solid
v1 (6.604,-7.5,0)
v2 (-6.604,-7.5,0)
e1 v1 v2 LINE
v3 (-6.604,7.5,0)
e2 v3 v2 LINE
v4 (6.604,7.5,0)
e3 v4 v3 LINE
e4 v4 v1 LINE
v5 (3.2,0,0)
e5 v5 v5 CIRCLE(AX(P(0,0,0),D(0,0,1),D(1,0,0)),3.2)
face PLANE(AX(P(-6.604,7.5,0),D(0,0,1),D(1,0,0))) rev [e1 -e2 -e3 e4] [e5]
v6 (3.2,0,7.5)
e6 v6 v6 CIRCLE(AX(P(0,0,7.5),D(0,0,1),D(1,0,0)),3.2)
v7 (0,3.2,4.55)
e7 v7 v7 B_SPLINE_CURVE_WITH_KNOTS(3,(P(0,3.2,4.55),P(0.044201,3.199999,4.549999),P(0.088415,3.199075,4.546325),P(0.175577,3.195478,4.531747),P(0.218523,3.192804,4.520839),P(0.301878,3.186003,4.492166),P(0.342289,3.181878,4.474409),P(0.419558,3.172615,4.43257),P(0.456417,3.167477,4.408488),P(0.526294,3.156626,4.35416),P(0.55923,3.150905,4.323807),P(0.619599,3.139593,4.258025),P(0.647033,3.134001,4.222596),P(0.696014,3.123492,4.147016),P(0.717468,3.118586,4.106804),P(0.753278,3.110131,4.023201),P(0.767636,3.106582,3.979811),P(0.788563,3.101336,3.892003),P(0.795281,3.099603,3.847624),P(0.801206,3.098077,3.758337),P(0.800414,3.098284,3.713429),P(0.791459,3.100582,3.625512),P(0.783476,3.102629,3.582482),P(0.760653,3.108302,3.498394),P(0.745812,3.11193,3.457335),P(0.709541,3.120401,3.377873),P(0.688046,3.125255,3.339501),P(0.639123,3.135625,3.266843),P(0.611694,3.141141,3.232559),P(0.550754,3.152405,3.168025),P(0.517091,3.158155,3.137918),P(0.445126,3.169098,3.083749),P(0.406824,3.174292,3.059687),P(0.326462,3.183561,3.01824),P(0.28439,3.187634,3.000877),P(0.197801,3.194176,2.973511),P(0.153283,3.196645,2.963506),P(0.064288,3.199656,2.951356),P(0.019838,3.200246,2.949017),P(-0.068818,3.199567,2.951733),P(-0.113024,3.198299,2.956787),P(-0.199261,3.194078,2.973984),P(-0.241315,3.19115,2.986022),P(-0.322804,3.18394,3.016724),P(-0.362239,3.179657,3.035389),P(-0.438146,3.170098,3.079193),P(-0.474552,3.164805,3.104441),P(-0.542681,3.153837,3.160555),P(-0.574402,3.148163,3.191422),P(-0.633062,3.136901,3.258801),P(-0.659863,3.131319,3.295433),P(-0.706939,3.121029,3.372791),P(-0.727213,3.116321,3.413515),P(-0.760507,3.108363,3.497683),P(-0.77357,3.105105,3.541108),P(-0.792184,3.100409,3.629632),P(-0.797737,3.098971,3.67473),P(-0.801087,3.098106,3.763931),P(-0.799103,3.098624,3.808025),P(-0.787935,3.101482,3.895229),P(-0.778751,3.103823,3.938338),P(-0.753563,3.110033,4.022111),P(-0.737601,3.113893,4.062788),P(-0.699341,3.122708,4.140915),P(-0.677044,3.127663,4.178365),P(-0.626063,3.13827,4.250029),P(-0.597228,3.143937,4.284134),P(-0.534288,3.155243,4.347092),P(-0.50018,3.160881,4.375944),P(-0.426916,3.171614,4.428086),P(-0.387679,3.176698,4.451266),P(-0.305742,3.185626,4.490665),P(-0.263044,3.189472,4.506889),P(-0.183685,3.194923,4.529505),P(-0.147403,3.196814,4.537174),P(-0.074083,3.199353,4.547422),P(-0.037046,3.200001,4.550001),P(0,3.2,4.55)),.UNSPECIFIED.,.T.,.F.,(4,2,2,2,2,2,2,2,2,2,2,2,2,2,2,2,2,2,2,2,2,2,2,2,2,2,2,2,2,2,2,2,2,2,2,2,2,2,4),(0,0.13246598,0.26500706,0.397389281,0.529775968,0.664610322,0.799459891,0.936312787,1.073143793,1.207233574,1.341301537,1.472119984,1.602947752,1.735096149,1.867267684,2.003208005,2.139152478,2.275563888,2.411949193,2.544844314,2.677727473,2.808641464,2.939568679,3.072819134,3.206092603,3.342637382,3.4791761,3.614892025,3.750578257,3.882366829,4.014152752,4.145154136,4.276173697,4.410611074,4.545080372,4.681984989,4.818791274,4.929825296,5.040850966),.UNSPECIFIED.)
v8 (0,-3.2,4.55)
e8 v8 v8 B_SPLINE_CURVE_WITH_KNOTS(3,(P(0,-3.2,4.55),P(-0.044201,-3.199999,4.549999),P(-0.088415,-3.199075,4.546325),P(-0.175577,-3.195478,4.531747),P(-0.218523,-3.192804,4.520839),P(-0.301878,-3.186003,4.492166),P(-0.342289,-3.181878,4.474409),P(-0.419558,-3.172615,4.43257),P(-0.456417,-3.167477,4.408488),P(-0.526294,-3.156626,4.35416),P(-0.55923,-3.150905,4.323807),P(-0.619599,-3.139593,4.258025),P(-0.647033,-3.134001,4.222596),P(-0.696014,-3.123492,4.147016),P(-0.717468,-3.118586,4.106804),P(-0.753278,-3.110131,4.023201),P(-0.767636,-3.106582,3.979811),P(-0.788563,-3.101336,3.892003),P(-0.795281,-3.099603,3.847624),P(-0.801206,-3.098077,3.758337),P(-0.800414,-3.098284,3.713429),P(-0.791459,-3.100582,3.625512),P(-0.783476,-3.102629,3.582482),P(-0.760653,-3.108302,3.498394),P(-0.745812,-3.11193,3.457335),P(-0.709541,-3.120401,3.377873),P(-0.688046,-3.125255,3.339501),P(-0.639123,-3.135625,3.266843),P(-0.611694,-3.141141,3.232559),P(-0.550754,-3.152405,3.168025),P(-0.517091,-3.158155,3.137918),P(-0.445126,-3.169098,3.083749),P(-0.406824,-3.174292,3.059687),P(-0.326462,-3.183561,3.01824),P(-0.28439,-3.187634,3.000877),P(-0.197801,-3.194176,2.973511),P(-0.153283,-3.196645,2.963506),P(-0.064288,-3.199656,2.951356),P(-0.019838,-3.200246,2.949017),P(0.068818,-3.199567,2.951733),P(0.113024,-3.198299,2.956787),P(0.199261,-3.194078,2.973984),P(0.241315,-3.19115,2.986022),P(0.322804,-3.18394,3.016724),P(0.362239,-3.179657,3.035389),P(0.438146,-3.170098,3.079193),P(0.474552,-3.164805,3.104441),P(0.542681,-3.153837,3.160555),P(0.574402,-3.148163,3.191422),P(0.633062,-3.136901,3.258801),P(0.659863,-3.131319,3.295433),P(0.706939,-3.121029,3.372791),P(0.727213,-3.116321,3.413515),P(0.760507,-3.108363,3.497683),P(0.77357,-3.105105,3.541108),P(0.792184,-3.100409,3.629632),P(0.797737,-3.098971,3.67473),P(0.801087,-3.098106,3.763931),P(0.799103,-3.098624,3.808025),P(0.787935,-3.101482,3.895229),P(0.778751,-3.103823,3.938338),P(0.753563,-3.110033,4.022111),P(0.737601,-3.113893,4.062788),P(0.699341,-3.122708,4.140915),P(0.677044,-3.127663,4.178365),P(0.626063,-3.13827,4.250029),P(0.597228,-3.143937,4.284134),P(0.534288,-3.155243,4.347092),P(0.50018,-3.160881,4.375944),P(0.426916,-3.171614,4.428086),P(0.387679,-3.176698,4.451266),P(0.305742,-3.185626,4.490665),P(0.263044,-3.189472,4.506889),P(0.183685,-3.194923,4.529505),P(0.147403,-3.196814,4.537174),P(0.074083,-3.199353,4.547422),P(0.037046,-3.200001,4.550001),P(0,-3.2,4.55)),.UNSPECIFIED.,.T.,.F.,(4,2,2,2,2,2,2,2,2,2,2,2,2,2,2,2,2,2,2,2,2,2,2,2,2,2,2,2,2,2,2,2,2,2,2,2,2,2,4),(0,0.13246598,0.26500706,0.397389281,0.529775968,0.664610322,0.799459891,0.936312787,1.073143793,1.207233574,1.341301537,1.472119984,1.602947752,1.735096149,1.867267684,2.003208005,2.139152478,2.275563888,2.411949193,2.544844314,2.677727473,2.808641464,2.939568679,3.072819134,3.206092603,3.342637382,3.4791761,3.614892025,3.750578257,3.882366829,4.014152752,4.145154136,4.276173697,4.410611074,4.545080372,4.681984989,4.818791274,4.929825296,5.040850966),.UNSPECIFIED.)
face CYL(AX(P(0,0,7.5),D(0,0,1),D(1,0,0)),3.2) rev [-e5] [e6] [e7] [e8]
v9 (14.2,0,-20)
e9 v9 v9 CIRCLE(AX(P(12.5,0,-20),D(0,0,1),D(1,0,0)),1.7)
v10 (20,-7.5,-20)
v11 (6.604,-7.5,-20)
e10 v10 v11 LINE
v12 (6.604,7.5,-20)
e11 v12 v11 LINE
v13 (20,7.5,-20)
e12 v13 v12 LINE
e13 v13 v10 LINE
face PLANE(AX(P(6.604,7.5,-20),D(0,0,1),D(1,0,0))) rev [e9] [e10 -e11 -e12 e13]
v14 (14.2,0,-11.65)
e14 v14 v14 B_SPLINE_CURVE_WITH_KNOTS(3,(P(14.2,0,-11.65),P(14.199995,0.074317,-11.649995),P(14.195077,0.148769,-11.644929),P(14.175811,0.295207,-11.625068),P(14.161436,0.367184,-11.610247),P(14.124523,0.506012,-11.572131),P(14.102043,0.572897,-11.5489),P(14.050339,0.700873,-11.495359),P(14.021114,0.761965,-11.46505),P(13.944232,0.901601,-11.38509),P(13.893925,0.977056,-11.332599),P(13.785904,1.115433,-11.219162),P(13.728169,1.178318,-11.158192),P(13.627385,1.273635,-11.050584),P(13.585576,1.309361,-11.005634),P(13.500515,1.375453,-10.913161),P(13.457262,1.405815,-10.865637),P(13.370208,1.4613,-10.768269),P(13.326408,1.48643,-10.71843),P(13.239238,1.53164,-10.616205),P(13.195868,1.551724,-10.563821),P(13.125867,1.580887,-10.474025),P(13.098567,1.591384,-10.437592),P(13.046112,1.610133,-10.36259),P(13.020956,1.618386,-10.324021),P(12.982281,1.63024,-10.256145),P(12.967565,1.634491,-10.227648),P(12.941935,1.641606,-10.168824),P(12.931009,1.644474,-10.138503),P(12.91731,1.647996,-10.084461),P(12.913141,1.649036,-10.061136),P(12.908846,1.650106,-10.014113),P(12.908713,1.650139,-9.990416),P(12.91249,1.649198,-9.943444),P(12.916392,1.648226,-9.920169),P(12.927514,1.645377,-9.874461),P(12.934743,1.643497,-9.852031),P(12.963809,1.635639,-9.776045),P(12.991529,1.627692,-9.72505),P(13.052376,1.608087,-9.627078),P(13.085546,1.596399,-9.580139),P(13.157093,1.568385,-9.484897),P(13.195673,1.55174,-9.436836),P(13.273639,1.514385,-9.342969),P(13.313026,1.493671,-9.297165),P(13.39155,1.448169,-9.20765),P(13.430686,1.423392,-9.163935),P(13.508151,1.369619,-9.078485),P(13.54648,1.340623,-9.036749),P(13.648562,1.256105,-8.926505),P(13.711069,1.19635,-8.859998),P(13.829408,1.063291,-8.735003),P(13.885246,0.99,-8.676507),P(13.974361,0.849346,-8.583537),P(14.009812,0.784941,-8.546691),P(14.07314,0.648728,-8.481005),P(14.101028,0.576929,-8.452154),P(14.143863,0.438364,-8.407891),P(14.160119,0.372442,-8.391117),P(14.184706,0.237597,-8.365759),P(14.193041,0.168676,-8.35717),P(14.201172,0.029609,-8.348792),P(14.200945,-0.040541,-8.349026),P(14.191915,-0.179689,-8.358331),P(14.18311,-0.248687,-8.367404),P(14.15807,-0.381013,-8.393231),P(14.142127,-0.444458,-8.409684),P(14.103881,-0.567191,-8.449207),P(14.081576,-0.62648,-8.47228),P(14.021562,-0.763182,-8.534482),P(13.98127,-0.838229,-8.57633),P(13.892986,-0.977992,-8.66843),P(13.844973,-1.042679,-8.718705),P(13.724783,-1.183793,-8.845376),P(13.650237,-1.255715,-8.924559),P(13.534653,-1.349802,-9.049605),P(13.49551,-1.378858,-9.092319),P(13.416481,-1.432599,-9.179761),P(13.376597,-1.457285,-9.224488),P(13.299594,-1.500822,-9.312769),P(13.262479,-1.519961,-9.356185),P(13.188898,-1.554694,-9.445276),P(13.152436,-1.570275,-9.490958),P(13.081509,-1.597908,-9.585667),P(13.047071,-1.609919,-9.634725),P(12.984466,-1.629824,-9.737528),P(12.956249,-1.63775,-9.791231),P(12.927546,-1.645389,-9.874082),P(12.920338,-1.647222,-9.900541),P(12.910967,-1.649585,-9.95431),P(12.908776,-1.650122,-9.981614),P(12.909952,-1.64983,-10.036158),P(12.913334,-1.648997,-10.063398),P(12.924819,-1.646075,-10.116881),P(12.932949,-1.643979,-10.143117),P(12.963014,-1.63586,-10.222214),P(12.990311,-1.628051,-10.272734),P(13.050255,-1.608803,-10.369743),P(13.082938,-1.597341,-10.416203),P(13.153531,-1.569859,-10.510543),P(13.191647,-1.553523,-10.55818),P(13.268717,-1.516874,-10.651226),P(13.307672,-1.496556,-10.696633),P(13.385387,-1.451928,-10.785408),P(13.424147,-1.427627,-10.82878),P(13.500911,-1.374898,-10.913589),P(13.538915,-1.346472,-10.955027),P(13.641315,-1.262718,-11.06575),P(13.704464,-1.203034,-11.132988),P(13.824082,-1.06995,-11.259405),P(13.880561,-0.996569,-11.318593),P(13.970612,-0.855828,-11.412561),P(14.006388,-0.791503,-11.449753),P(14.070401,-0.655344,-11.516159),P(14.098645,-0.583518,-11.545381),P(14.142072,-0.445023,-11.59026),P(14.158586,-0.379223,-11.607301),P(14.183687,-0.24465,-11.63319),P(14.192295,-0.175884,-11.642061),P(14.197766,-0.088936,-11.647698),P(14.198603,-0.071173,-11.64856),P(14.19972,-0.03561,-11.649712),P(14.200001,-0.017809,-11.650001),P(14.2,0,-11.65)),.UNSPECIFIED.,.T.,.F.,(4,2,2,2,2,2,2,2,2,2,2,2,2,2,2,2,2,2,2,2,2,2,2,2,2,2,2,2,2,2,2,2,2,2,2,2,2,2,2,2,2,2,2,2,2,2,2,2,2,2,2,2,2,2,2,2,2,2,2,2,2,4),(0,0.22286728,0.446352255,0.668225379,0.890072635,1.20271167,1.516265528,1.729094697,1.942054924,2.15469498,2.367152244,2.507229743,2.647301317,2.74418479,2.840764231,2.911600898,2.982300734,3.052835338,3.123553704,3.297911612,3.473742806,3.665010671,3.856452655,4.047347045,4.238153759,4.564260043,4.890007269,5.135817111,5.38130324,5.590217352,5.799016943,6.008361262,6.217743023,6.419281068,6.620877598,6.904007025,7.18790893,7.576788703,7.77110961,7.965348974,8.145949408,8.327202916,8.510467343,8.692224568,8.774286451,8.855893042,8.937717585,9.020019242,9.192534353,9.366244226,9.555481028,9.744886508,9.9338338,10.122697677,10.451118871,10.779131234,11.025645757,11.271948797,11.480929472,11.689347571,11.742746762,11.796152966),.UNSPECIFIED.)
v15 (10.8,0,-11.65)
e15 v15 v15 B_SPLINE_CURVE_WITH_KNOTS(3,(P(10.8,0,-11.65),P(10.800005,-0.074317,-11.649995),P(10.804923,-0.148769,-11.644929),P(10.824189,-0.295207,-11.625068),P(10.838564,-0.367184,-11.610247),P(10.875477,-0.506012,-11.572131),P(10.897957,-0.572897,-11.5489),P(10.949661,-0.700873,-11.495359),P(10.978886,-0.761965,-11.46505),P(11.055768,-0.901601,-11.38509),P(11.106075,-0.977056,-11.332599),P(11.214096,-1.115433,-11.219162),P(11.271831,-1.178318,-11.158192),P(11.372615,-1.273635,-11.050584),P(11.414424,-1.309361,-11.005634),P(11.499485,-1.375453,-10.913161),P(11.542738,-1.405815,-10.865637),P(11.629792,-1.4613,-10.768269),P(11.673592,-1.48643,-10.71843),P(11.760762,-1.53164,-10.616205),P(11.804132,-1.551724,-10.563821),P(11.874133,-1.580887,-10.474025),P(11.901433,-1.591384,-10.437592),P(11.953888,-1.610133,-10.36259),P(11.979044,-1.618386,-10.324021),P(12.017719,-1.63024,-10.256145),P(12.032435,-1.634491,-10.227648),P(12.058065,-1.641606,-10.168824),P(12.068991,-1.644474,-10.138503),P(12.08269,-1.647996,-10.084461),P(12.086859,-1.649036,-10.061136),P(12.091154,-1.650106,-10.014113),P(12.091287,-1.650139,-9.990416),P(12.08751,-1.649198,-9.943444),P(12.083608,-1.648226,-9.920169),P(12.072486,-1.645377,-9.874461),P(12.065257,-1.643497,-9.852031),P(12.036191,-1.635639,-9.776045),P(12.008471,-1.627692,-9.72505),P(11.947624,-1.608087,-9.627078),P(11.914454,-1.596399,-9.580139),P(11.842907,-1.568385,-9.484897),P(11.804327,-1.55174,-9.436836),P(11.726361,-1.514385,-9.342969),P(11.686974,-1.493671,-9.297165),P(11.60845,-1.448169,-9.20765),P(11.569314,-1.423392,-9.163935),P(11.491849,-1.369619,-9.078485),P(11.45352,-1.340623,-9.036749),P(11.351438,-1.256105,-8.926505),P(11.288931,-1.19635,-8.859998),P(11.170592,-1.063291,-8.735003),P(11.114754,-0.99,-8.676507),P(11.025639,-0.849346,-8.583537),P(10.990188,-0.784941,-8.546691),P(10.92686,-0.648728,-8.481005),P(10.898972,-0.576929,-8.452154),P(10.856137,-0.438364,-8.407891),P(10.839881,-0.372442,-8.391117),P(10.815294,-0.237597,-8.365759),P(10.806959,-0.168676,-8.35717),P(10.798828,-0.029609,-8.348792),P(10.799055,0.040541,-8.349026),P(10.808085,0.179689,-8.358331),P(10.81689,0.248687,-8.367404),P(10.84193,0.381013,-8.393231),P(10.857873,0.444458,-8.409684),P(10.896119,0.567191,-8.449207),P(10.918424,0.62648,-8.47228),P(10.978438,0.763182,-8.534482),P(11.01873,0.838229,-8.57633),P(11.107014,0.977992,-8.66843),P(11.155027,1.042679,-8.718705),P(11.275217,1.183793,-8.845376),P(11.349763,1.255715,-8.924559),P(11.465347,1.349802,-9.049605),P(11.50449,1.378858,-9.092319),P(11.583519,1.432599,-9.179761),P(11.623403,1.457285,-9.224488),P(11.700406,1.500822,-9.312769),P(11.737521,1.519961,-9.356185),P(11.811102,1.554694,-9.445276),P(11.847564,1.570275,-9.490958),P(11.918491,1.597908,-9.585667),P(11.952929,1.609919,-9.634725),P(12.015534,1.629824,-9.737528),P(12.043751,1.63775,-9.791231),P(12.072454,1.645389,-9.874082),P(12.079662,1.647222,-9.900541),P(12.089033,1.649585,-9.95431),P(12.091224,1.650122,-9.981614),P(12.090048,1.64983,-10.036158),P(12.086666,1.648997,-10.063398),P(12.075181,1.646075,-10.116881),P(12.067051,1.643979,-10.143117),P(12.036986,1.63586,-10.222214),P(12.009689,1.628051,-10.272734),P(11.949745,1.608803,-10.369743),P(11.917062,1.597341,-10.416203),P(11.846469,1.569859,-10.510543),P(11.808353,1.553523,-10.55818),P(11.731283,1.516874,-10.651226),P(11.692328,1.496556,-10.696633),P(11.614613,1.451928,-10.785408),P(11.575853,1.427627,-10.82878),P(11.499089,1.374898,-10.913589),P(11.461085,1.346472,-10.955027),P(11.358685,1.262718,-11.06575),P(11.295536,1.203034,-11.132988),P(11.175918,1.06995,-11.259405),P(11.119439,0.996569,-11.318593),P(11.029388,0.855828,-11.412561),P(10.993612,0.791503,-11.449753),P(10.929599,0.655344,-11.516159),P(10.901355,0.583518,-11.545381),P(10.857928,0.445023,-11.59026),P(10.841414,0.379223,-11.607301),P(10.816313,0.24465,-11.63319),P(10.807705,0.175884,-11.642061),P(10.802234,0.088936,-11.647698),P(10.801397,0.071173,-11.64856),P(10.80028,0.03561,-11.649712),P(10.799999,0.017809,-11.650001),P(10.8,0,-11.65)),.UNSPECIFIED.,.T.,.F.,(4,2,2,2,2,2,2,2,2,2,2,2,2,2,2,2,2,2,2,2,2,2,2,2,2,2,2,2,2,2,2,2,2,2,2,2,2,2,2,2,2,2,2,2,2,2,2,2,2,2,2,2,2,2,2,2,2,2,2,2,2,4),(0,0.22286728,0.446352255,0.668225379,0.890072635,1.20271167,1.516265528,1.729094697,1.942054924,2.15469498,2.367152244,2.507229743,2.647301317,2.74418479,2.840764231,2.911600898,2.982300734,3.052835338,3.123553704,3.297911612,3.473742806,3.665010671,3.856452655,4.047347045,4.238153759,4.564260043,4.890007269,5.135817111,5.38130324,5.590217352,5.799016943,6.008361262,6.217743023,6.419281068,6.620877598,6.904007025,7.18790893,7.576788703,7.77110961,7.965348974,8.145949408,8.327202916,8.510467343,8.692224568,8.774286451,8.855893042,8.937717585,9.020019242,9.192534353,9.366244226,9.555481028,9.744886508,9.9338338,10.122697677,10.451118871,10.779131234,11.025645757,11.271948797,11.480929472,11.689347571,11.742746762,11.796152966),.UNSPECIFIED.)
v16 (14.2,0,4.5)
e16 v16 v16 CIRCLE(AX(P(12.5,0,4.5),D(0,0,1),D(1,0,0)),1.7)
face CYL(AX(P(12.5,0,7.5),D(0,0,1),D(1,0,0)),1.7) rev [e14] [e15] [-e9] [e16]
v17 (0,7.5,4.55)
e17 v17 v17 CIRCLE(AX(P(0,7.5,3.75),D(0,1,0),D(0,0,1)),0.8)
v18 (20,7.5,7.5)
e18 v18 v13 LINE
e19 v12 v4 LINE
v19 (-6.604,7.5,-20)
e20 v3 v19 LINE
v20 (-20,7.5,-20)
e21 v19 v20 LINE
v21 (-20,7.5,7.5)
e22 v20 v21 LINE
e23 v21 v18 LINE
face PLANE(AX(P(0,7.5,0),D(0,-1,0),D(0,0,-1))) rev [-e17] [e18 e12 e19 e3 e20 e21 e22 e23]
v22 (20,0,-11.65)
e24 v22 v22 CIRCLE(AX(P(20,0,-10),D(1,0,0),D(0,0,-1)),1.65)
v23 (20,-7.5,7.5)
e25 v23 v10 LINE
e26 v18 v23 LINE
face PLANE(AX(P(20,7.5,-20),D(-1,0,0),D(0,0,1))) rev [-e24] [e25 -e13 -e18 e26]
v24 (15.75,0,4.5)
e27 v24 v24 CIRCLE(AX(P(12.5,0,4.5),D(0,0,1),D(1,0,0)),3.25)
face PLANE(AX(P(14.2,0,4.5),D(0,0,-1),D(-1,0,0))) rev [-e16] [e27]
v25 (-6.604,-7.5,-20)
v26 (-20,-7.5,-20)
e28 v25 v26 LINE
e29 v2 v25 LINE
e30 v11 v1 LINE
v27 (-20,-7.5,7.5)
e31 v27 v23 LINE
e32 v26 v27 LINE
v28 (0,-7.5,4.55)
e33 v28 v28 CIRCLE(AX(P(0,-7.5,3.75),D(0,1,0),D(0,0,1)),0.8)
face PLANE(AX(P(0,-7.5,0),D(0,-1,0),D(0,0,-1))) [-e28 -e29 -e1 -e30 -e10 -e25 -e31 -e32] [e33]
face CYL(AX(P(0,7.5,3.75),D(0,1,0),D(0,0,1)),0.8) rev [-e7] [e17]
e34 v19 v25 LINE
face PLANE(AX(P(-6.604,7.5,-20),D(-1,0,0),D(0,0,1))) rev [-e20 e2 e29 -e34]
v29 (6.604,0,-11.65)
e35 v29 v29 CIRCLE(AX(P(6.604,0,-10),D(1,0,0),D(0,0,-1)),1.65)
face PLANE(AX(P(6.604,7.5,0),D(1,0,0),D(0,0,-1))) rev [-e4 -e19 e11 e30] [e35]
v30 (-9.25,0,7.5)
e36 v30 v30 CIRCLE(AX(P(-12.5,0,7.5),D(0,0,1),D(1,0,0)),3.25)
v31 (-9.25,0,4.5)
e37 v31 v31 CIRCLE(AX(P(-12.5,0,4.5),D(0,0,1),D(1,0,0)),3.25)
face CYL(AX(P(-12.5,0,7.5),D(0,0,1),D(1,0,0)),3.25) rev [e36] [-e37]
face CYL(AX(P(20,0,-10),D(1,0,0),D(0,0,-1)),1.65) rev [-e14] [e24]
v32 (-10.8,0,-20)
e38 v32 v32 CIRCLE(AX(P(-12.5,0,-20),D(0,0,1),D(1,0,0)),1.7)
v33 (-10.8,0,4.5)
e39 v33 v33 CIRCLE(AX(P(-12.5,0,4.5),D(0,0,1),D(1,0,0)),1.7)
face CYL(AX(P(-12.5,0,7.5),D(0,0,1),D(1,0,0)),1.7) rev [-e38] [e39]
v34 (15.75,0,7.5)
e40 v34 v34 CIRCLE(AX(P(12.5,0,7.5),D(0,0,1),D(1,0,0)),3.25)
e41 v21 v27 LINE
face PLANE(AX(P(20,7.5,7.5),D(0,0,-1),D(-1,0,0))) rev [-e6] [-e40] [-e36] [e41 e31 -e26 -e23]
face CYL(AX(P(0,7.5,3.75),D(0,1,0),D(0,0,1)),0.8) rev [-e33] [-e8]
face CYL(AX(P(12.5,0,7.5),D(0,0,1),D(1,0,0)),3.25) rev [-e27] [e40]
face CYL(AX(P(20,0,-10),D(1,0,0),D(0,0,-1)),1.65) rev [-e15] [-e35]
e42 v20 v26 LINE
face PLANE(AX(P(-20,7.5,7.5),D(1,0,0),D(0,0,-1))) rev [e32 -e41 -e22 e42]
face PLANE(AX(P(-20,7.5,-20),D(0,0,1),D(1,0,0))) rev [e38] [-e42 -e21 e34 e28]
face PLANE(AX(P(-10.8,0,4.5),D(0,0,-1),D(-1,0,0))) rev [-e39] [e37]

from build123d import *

# Parameters (mm, degrees)
BOSS_EXTRUDE1_DEPTH                 = 7.5
CBORE_FOR_M3_SHCS1_D                = 3.4
CBORE_FOR_M3_SHCS1_CBORE_D          = 6.5
CBORE_FOR_M3_SHCS1_CBORE_DEPTH      = 3
M6_CLEARANCE_HOLE1_D                = 6.4
TAP_DRILL_FOR_M2X0_4_TAP1_D         = 1.6
TAP_START                           = 6.604
TAP_DRILL_FOR_M4X0_7_TAP1_OUTLINE_R = 1.65
TAP_DRILL_FOR_M4X0_7_TAP1_DEPTH     = 13.396


# Read off the part's stored shape, not the designer's step: Tap Drill for M4x0.7 Tap1
with BuildPart() as part:
    # Sketch1 → Boss-Extrude1 (new, symmetric)
    with BuildSketch(Plane(origin=(0, 0, 0), x_dir=(1, 0, 0), z_dir=(0, 1, 0))):
        Polygon((-6.604, 0), (6.604, 0), (6.604, 20), (20, 20), (20, -7.5), (-20, -7.5), (-20, 20), (-6.604, 20), align=None)
    extrude(amount=BOSS_EXTRUDE1_DEPTH, both=True)

    # CBORE for M3 SHCS1 (through all)
    with Locations(Plane.XY.offset(7.5)):
        with Locations((-12.5, 0), (12.5, 0)):
            CounterBoreHole(CBORE_FOR_M3_SHCS1_D / 2, CBORE_FOR_M3_SHCS1_CBORE_D / 2, CBORE_FOR_M3_SHCS1_CBORE_DEPTH)

    # M6 Clearance Hole1 (through all)
    with Locations(Plane.XY.offset(7.5)):
        with Locations((0, 0)):
            Hole(M6_CLEARANCE_HOLE1_D / 2)

    # Tap Drill for M2x0.4 Tap1 (through all)
    with Locations(Plane(origin=(0, 7.5, 0), x_dir=(1, 0, 0), z_dir=(0, 1, 0))):
        with Locations((0, -3.75)):
            Hole(TAP_DRILL_FOR_M2X0_4_TAP1_D / 2)

    # Tap Drill for M4x0.7 Tap1 outline → Tap Drill for M4x0.7 Tap1 (cut)
    with BuildSketch(Plane.YZ.offset(TAP_START)):
        with Locations((0, -10)):
            Circle(TAP_DRILL_FOR_M4X0_7_TAP1_OUTLINE_R)
    extrude(amount=TAP_DRILL_FOR_M4X0_7_TAP1_DEPTH, mode=Mode.SUBTRACT)


solid = part.part
